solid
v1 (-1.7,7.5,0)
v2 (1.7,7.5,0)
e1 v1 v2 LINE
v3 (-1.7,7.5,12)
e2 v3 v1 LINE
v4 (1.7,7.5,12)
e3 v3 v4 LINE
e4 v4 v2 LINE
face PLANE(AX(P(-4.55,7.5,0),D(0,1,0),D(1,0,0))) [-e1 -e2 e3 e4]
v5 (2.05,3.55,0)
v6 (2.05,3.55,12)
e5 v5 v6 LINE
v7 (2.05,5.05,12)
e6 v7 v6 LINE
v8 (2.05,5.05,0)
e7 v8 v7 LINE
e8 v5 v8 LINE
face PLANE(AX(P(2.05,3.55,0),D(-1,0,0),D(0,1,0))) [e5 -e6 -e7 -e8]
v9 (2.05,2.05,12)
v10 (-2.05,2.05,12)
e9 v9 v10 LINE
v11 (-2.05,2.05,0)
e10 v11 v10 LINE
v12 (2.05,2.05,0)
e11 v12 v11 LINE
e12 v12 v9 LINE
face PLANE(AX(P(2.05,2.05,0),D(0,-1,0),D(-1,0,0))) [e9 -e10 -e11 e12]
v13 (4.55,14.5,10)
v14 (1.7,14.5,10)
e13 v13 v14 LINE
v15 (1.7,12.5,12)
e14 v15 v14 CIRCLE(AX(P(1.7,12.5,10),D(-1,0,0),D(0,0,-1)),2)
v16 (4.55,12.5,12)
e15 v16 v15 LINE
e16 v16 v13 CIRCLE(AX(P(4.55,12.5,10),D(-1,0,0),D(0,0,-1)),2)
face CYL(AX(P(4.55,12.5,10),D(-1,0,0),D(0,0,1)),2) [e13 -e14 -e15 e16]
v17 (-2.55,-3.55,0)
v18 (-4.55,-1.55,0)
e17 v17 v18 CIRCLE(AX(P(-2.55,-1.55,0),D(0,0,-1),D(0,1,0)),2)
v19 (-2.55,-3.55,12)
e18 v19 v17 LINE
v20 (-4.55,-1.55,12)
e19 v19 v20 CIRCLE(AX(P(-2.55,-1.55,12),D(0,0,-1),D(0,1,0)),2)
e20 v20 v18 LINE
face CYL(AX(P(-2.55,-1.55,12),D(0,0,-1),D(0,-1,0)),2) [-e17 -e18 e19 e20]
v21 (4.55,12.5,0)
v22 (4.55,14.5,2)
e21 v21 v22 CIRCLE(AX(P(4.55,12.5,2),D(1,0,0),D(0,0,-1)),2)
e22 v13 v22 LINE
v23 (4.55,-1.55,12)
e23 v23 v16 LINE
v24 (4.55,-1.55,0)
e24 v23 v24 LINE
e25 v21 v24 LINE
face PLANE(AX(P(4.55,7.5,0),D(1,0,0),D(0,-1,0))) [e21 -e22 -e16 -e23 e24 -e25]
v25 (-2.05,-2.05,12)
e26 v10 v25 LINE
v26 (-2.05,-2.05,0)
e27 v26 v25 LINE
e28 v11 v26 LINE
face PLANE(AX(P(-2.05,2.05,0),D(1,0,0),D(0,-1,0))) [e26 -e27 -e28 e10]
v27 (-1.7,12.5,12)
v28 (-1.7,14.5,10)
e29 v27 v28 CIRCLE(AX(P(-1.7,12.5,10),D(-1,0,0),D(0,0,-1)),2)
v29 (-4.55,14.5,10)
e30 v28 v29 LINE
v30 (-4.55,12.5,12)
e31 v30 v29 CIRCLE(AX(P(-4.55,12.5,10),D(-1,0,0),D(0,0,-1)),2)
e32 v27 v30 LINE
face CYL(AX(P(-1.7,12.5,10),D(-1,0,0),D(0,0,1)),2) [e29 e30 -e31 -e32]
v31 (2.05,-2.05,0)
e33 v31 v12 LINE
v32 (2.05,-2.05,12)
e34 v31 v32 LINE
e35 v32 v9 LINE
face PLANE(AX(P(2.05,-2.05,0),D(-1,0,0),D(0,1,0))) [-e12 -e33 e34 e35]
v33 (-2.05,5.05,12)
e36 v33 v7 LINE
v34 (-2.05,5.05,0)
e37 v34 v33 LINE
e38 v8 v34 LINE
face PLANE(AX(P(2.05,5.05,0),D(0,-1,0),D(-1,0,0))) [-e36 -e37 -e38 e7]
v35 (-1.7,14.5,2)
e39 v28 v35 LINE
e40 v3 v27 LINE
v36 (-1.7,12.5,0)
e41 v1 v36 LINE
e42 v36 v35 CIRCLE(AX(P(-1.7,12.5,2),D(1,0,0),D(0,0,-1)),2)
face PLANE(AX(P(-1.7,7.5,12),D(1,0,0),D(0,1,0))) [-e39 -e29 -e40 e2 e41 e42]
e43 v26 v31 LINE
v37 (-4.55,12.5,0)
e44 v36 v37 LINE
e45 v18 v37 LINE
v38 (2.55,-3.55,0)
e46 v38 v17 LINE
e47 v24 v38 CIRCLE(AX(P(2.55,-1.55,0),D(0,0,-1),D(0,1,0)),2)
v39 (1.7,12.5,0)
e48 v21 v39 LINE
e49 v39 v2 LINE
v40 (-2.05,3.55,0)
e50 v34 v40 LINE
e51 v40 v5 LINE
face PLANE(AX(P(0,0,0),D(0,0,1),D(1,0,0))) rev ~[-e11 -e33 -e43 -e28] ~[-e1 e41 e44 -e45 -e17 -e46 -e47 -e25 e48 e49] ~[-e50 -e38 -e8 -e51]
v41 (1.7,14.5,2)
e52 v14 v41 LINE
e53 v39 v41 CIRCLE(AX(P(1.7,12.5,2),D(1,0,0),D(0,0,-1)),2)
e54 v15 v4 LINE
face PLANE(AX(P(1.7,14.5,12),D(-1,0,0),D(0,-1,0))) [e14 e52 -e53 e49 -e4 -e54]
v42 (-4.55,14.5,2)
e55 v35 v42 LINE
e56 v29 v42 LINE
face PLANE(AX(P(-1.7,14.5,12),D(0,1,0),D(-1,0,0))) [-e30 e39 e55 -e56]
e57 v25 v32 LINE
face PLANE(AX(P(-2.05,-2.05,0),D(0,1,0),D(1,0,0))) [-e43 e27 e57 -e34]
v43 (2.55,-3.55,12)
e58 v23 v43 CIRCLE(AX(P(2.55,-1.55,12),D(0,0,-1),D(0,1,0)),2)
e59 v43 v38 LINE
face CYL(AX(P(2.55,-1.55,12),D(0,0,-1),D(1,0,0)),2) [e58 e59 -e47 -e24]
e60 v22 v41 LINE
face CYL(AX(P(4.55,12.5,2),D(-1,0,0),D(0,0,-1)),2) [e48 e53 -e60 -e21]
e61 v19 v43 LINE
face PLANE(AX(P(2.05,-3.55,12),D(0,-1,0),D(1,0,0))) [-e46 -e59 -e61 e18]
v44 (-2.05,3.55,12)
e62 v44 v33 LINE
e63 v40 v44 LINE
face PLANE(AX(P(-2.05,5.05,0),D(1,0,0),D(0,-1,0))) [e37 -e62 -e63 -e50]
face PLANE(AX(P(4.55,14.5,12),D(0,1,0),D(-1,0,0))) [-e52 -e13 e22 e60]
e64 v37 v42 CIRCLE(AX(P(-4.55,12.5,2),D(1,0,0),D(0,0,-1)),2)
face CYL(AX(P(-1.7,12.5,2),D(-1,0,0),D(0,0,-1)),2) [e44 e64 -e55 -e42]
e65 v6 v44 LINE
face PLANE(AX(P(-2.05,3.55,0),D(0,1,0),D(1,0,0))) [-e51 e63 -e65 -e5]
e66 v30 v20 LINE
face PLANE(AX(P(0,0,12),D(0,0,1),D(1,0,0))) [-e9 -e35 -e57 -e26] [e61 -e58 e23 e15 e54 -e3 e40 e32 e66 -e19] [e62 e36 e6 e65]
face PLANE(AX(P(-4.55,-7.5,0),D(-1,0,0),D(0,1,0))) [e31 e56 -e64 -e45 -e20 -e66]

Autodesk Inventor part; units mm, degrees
sketch "Sketch1" plane through (0, 0, 0) normal (0, 0, 1) x (1, 0, 0)
  line L0 (-4.55, 7.5) -> (4.55, 7.5)
  line L1 (4.55, 7.5) -> (4.55, -7.5)
  line L2 (4.55, -7.5) -> (-4.55, -7.5)
  line L3 (-4.55, -7.5) -> (-4.55, 7.5)
  line L4 (-4.55, 7.5) -> (4.55, -7.5) construction
  line L5 (4.55, 7.5) -> (-4.55, -7.5) construction
  line L6 (-2.05, -2.05) -> (2.05, -2.05)
  line L7 (2.05, -2.05) -> (2.05, 2.05)
  line L8 (2.05, 2.05) -> (-2.05, 2.05)
  line L9 (-2.05, 2.05) -> (-2.05, -2.05)
  line L10 (-2.05, -2.05) -> (2.05, 2.05) construction
  line L11 (2.05, -2.05) -> (-2.05, 2.05) construction
  line L12 (-4.55, 6) -> (-4.55, 7.5)
  line L13 (-4.55, -6) -> (-4.55, -7.5)
  line L14 (4.55, 6) -> (4.55, 7.5)
  line L15 (4.55, -6) -> (4.55, -7.5)
  point P0 (0, 0)
  point P1 (16.55, 6)
  dimension "d1" = 9.1
  dimension "d2" = 4.1
  dimension "d3" = 4.1
extrude "Extrusion1" add sketch "Sketch1" along normal blind 12
sketch "Sketch2" plane through (0, 0, 12) normal (0, 0, 1) x (1, 0, 0)
  line L0 (4.55, 7.5) -> (-4.55, 7.5) projected
  line L1 (-4.55, 7.5) -> (-1.7, 7.5)
  line L2 (-1.7, 7.5) -> (-1.7, 14.5)
  line L3 (-1.7, 14.5) -> (-4.55, 14.5)
  line L4 (-4.55, 14.5) -> (-4.55, 7.5)
  line L5 (1.7, 7.5) -> (4.55, 7.5)
  line L6 (4.55, 7.5) -> (4.55, 14.5)
  line L7 (4.55, 14.5) -> (1.7, 14.5)
  line L8 (1.7, 14.5) -> (1.7, 7.5)
  point P0 (0, 0)
  point P1 (16.55, 7.5)
  point P2 (-16.55, 7.5)
  dimension "d15" = 2.85
  dimension "d16" = 2.85
  dimension "d17" = 7
  dimension "d18" = 7
  dimension "d19" = 1.7
  dimension "d20" = 1.7
extrude "Extrusion2" add sketch "Sketch2" against normal up to surface (12 mm away)
sketch "Sketch5" plane through (0, 0, 0) normal (0, 0, -1) x (-1, 0, 0)
  line L0 (-2.05, 5.05) -> (2.05, 5.05)
  line L1 (2.05, 5.05) -> (2.05, 3.55)
  line L2 (2.05, 3.55) -> (-2.05, 3.55)
  line L3 (-2.05, 3.55) -> (-2.05, 5.05)
  line L4 (-2.05, -3.55) -> (2.05, -3.55)
  line L5 (2.05, -3.55) -> (2.05, -5.05)
  line L6 (2.05, -5.05) -> (-2.05, -5.05)
  line L7 (-2.05, -5.05) -> (-2.05, -3.55)
  line L8 (2.05, 2.05) -> (-2.05, 2.05) projected
  line L9 (2.05, -2.05) -> (2.05, 2.05) projected
  line L10 (-2.05, -2.05) -> (2.05, -2.05) projected
  point P0 (0, 0)
  dimension "d31" = 4.1
  dimension "d32" = 4.1
  dimension "d33" = 1.5
  dimension "d34" = 1.5
  dimension "d35" = 1.5
  dimension "d36" = 1.5
extrude "Extrusion4" cut sketch "Sketch5" against normal through all
sketch "Sketch6" plane through (0, 0, 12) normal (0, 0, 1) x (1, 0, 0)
  line L0 (-4.55, 14.5) -> (-4.55, -7.5) projected
  line L1 (-4.55, -7.5) -> (4.55, -7.5) projected
  line L2 (-4.55, -3.55) -> (4.55, -3.55)
  line L3 (4.55, -3.55) -> (4.55, -7.5)
  line L4 (4.55, -7.5) -> (-4.55, -7.5)
  line L5 (-4.55, -7.5) -> (-4.55, -3.55)
  line L6 (-2.05, -3.55) -> (2.05, -3.55) projected
  point P0 (0, 0)
  dimension "d42" = 0
extrude "Extrusion5" cut sketch "Sketch6" against normal through all
fillet "Fillet3" radius 2 6 edges at (4.55, -3.55, 6) (-4.55, -3.55, 6) (3.125, 14.5, 12) (-3.125, 14.5, 12) (-3.125, 14.5, 0) (3.125, 14.5, 0)
equation "\"d31\" = d32"
properties part number "fuselage_honeycomb_interface_v2"
